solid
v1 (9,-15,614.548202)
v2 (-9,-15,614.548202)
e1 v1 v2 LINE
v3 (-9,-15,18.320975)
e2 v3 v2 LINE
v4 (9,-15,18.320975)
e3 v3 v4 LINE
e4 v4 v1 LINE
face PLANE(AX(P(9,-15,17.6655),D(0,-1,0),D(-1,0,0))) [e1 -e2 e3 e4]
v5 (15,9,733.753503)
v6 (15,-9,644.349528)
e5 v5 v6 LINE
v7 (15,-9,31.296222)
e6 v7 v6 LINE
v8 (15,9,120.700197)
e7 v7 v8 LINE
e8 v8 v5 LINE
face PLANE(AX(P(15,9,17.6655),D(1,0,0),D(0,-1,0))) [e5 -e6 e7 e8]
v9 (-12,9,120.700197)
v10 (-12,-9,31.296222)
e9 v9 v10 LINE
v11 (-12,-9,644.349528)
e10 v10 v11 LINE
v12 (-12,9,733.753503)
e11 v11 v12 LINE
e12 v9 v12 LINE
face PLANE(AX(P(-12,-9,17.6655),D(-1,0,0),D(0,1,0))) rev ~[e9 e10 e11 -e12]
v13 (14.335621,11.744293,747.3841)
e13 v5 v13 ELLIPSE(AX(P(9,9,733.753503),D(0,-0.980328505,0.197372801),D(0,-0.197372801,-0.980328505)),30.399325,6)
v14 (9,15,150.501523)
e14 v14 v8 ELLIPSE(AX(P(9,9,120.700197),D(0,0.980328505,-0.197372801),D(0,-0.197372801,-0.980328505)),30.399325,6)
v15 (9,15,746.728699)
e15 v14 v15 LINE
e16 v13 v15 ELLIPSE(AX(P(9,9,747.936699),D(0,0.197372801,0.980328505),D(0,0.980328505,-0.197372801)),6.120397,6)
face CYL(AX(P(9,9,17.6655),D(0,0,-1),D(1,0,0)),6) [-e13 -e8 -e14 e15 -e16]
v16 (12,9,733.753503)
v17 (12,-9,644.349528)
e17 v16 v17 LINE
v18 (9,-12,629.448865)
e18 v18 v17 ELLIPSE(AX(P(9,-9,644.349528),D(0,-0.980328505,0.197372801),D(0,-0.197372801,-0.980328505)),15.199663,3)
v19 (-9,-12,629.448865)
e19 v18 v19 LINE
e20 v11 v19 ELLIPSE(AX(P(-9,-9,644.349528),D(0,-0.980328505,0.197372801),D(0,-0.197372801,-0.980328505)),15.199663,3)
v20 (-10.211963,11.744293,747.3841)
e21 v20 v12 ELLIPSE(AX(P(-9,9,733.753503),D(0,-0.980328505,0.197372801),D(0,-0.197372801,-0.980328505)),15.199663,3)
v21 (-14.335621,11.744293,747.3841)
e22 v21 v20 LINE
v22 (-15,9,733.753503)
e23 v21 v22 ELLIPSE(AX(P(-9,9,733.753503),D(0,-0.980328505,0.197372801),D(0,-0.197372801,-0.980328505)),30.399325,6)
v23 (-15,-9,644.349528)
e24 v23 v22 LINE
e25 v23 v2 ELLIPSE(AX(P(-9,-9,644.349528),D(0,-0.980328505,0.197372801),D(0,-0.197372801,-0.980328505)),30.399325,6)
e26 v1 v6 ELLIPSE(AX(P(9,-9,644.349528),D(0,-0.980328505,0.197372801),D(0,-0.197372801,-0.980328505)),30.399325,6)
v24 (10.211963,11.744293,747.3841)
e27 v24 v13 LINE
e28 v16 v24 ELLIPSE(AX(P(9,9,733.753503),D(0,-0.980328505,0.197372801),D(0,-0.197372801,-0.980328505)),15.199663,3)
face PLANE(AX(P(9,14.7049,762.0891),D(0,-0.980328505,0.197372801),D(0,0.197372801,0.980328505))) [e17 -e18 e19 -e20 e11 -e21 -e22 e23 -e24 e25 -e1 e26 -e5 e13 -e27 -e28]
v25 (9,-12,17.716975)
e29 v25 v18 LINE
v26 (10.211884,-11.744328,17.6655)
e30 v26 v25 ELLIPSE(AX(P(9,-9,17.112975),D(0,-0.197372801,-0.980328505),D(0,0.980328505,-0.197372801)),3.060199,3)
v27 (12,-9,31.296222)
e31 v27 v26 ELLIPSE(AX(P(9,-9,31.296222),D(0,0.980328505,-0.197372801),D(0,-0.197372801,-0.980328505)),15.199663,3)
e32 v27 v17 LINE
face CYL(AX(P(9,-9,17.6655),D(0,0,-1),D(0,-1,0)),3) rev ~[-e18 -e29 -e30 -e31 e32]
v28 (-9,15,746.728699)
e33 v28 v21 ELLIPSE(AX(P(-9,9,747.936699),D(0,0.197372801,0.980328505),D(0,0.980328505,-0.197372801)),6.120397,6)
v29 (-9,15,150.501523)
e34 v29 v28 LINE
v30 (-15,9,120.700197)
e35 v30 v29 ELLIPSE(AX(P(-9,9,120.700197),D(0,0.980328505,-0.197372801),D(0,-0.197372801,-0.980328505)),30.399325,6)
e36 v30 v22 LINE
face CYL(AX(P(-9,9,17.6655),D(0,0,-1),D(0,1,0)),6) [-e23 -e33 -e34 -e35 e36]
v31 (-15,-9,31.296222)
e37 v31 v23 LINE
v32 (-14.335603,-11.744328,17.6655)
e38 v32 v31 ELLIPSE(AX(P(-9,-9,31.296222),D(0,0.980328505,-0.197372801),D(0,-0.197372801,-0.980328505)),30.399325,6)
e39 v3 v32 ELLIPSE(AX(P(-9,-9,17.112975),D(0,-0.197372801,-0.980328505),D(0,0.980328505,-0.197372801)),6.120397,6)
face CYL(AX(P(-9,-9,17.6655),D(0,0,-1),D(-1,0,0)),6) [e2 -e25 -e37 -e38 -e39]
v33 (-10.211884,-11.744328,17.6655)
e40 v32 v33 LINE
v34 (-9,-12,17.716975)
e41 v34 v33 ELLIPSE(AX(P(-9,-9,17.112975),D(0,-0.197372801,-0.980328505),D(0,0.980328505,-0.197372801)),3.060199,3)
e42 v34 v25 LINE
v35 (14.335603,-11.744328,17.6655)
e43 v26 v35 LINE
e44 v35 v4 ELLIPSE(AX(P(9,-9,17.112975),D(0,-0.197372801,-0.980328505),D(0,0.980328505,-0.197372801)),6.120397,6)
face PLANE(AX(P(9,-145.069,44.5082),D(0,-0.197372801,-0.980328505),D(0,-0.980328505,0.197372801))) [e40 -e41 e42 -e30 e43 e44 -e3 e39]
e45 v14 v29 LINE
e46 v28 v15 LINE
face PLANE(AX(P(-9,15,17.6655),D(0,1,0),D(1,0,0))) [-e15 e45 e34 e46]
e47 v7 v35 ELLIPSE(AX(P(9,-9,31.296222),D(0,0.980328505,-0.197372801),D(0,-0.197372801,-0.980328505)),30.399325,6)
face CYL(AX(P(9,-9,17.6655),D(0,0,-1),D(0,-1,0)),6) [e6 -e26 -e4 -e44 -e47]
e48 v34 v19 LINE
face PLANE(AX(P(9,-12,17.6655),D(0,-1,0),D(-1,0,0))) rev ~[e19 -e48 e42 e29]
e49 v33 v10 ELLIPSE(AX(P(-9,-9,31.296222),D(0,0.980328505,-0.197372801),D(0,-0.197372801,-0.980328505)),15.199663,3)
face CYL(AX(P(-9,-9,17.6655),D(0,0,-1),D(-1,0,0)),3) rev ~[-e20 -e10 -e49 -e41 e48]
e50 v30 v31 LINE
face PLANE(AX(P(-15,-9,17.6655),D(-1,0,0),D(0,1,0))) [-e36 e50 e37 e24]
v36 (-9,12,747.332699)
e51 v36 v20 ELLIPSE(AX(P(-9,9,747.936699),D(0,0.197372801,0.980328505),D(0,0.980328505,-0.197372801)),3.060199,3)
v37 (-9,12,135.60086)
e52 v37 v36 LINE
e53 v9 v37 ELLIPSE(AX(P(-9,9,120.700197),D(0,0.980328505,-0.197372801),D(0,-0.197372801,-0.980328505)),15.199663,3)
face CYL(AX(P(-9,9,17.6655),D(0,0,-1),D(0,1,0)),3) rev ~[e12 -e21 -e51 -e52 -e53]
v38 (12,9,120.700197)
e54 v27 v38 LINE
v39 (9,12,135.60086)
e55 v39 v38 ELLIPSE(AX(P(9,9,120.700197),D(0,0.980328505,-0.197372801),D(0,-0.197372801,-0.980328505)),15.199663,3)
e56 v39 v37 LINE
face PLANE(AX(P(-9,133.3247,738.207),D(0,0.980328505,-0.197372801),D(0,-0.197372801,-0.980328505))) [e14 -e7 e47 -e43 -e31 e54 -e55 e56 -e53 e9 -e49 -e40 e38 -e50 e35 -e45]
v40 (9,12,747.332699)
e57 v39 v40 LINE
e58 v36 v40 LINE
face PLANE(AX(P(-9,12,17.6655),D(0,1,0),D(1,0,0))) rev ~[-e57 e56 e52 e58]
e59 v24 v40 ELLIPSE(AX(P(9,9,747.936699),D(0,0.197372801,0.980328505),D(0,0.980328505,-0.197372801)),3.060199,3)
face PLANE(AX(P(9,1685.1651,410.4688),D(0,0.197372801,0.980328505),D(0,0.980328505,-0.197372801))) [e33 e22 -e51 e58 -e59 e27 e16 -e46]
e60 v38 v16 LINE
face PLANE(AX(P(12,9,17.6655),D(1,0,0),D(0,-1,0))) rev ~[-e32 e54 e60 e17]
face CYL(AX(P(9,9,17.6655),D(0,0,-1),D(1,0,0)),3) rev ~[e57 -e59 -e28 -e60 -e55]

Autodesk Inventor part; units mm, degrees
ref_plane "Start plane" through (0, 0, 17.6655) normal (0, 0, 1) x (1, 0, 0)
ref_plane "End plane" through (0, 0, 747.3842) normal (0, 0, 1) x (1, 0, 0)
sketch "Sketch" plane through (0, 0, 0) normal (0, 0, 1) x (1, 0, 0)
  line L0 (-15, -9) -> (-15, 9)
  line L1 (-9, 15) -> (9, 15)
  line L2 (15, 9) -> (15, -9)
  line L3 (9, -15) -> (-9, -15)
  arc A0 (-15, -9) -> (-9, -15) centre (-9, -9) ccw
  arc A1 (-9, 15) -> (-15, 9) centre (-9, 9) ccw
  arc A2 (15, 9) -> (9, 15) centre (9, 9) ccw
  arc A3 (9, -15) -> (15, -9) centre (9, -9) ccw
  arc A4 (-9, 12) -> (-12, 9) centre (-9, 9) ccw
  line L4 (-9, 12) -> (9, 12)
  arc A5 (12, 9) -> (9, 12) centre (9, 9) ccw
  line L5 (12, 9) -> (12, -9)
  arc A6 (9, -12) -> (12, -9) centre (9, -9) ccw
  line L6 (9, -12) -> (-9, -12)
  arc A7 (-12, -9) -> (-9, -12) centre (-9, -9) ccw
  line L7 (-12, -9) -> (-12, 9)
  line L8 (0, 22.7397) -> (0, -22.7397) construction
  line L9 (-22.7397, 0) -> (22.7397, 0) construction
  dimension "d7" = 6
  dimension "d10" = 30
  dimension "d11" = 30
  dimension "d12" = 3
  dimension "d15" = 15
  dimension "d16" = 15
extrude "Body" add sketch "Sketch" along normal up to surface (729.7186 mm away) from surface at 17.6655
sketch "Sketch3" plane through (0, 0, 0) normal (0, 0, 1) x (1, 0, 0)
  line L0 (0, 0) -> (10, 0)
ref_plane "Work Plane3" through (0, 0, 0) normal (0, -1, 0) x (1, 0, 0)
ref_plane "Work Plane4" through (9, -145.069, 44.5082) normal (0, -0.1973728, -0.9803285) x (1, 0, 0)
split "Split1" plane through (9, -145.069, 44.5082) removes the side toward (0, -0.1973728, -0.9803285)
ref_plane "Work Plane5" through (9, 14.7049, 762.0891) normal (0, -0.9803285, 0.1973728) x (1, 0, 0)
split "Split2" plane through (9, 14.7049, 762.0891) removes the side toward (0, -0.9803285, 0.1973728)
ref_plane "Work Plane6" through (9, 1685.1651, 410.4688) normal (0, 0.1973728, 0.9803285) x (1, 0, 0)
split "Split3" plane through (9, 1685.1651, 410.4688) removes the side toward (0, 0.1973728, 0.9803285)
ref_plane "Work Plane7" through (-9, 133.3247, 738.207) normal (0, 0.9803285, -0.1973728) x (1, 0, 0)
split "Split4" plane through (-9, 133.3247, 738.207) removes the side toward (0, 0.9803285, -0.1973728)
sketch "Sketch4" plane through (0, 0, 0) normal (0, -1, 0) x (1, 0, 0)
  line L0 (-2, 17.6655) -> (12, 17.6655) projected
  line L1 (-2, 747.3842) -> (12, 747.3842) projected
  dimension "d18" = 729.7186
equation "\"d7\" = G_IR"
equation "\"d10\" = G_H"
equation "\"d11\" = G_W"
equation "\"d12\" = G_T"
equation "\"d15\" = 0.5 * d10"
equation "\"d16\" = 0.5 * d11"
equation "\"d3\" = G_L"
equation "\"G_W\" = 30"
equation "\"G_H\" = 30"
equation "\"G_T\" = 3"
equation "\"G_IR\" = 6"
equation "\"G_L\" = d18"
equation "\"G_OFFSET_START\" = -17.66552"
equation "\"G_OFFSET_END\" = -17.66552"
equation "\"d13\" = -G_OFFSET_START"
equation "\"d14\" = G_OFFSET_END + B_L"
equation "\"B_L\" = 765.04967"
properties part number "DIN EN 10219-2 - 30 x 30 x 3  - 729.72" material "Steel, Mild"
